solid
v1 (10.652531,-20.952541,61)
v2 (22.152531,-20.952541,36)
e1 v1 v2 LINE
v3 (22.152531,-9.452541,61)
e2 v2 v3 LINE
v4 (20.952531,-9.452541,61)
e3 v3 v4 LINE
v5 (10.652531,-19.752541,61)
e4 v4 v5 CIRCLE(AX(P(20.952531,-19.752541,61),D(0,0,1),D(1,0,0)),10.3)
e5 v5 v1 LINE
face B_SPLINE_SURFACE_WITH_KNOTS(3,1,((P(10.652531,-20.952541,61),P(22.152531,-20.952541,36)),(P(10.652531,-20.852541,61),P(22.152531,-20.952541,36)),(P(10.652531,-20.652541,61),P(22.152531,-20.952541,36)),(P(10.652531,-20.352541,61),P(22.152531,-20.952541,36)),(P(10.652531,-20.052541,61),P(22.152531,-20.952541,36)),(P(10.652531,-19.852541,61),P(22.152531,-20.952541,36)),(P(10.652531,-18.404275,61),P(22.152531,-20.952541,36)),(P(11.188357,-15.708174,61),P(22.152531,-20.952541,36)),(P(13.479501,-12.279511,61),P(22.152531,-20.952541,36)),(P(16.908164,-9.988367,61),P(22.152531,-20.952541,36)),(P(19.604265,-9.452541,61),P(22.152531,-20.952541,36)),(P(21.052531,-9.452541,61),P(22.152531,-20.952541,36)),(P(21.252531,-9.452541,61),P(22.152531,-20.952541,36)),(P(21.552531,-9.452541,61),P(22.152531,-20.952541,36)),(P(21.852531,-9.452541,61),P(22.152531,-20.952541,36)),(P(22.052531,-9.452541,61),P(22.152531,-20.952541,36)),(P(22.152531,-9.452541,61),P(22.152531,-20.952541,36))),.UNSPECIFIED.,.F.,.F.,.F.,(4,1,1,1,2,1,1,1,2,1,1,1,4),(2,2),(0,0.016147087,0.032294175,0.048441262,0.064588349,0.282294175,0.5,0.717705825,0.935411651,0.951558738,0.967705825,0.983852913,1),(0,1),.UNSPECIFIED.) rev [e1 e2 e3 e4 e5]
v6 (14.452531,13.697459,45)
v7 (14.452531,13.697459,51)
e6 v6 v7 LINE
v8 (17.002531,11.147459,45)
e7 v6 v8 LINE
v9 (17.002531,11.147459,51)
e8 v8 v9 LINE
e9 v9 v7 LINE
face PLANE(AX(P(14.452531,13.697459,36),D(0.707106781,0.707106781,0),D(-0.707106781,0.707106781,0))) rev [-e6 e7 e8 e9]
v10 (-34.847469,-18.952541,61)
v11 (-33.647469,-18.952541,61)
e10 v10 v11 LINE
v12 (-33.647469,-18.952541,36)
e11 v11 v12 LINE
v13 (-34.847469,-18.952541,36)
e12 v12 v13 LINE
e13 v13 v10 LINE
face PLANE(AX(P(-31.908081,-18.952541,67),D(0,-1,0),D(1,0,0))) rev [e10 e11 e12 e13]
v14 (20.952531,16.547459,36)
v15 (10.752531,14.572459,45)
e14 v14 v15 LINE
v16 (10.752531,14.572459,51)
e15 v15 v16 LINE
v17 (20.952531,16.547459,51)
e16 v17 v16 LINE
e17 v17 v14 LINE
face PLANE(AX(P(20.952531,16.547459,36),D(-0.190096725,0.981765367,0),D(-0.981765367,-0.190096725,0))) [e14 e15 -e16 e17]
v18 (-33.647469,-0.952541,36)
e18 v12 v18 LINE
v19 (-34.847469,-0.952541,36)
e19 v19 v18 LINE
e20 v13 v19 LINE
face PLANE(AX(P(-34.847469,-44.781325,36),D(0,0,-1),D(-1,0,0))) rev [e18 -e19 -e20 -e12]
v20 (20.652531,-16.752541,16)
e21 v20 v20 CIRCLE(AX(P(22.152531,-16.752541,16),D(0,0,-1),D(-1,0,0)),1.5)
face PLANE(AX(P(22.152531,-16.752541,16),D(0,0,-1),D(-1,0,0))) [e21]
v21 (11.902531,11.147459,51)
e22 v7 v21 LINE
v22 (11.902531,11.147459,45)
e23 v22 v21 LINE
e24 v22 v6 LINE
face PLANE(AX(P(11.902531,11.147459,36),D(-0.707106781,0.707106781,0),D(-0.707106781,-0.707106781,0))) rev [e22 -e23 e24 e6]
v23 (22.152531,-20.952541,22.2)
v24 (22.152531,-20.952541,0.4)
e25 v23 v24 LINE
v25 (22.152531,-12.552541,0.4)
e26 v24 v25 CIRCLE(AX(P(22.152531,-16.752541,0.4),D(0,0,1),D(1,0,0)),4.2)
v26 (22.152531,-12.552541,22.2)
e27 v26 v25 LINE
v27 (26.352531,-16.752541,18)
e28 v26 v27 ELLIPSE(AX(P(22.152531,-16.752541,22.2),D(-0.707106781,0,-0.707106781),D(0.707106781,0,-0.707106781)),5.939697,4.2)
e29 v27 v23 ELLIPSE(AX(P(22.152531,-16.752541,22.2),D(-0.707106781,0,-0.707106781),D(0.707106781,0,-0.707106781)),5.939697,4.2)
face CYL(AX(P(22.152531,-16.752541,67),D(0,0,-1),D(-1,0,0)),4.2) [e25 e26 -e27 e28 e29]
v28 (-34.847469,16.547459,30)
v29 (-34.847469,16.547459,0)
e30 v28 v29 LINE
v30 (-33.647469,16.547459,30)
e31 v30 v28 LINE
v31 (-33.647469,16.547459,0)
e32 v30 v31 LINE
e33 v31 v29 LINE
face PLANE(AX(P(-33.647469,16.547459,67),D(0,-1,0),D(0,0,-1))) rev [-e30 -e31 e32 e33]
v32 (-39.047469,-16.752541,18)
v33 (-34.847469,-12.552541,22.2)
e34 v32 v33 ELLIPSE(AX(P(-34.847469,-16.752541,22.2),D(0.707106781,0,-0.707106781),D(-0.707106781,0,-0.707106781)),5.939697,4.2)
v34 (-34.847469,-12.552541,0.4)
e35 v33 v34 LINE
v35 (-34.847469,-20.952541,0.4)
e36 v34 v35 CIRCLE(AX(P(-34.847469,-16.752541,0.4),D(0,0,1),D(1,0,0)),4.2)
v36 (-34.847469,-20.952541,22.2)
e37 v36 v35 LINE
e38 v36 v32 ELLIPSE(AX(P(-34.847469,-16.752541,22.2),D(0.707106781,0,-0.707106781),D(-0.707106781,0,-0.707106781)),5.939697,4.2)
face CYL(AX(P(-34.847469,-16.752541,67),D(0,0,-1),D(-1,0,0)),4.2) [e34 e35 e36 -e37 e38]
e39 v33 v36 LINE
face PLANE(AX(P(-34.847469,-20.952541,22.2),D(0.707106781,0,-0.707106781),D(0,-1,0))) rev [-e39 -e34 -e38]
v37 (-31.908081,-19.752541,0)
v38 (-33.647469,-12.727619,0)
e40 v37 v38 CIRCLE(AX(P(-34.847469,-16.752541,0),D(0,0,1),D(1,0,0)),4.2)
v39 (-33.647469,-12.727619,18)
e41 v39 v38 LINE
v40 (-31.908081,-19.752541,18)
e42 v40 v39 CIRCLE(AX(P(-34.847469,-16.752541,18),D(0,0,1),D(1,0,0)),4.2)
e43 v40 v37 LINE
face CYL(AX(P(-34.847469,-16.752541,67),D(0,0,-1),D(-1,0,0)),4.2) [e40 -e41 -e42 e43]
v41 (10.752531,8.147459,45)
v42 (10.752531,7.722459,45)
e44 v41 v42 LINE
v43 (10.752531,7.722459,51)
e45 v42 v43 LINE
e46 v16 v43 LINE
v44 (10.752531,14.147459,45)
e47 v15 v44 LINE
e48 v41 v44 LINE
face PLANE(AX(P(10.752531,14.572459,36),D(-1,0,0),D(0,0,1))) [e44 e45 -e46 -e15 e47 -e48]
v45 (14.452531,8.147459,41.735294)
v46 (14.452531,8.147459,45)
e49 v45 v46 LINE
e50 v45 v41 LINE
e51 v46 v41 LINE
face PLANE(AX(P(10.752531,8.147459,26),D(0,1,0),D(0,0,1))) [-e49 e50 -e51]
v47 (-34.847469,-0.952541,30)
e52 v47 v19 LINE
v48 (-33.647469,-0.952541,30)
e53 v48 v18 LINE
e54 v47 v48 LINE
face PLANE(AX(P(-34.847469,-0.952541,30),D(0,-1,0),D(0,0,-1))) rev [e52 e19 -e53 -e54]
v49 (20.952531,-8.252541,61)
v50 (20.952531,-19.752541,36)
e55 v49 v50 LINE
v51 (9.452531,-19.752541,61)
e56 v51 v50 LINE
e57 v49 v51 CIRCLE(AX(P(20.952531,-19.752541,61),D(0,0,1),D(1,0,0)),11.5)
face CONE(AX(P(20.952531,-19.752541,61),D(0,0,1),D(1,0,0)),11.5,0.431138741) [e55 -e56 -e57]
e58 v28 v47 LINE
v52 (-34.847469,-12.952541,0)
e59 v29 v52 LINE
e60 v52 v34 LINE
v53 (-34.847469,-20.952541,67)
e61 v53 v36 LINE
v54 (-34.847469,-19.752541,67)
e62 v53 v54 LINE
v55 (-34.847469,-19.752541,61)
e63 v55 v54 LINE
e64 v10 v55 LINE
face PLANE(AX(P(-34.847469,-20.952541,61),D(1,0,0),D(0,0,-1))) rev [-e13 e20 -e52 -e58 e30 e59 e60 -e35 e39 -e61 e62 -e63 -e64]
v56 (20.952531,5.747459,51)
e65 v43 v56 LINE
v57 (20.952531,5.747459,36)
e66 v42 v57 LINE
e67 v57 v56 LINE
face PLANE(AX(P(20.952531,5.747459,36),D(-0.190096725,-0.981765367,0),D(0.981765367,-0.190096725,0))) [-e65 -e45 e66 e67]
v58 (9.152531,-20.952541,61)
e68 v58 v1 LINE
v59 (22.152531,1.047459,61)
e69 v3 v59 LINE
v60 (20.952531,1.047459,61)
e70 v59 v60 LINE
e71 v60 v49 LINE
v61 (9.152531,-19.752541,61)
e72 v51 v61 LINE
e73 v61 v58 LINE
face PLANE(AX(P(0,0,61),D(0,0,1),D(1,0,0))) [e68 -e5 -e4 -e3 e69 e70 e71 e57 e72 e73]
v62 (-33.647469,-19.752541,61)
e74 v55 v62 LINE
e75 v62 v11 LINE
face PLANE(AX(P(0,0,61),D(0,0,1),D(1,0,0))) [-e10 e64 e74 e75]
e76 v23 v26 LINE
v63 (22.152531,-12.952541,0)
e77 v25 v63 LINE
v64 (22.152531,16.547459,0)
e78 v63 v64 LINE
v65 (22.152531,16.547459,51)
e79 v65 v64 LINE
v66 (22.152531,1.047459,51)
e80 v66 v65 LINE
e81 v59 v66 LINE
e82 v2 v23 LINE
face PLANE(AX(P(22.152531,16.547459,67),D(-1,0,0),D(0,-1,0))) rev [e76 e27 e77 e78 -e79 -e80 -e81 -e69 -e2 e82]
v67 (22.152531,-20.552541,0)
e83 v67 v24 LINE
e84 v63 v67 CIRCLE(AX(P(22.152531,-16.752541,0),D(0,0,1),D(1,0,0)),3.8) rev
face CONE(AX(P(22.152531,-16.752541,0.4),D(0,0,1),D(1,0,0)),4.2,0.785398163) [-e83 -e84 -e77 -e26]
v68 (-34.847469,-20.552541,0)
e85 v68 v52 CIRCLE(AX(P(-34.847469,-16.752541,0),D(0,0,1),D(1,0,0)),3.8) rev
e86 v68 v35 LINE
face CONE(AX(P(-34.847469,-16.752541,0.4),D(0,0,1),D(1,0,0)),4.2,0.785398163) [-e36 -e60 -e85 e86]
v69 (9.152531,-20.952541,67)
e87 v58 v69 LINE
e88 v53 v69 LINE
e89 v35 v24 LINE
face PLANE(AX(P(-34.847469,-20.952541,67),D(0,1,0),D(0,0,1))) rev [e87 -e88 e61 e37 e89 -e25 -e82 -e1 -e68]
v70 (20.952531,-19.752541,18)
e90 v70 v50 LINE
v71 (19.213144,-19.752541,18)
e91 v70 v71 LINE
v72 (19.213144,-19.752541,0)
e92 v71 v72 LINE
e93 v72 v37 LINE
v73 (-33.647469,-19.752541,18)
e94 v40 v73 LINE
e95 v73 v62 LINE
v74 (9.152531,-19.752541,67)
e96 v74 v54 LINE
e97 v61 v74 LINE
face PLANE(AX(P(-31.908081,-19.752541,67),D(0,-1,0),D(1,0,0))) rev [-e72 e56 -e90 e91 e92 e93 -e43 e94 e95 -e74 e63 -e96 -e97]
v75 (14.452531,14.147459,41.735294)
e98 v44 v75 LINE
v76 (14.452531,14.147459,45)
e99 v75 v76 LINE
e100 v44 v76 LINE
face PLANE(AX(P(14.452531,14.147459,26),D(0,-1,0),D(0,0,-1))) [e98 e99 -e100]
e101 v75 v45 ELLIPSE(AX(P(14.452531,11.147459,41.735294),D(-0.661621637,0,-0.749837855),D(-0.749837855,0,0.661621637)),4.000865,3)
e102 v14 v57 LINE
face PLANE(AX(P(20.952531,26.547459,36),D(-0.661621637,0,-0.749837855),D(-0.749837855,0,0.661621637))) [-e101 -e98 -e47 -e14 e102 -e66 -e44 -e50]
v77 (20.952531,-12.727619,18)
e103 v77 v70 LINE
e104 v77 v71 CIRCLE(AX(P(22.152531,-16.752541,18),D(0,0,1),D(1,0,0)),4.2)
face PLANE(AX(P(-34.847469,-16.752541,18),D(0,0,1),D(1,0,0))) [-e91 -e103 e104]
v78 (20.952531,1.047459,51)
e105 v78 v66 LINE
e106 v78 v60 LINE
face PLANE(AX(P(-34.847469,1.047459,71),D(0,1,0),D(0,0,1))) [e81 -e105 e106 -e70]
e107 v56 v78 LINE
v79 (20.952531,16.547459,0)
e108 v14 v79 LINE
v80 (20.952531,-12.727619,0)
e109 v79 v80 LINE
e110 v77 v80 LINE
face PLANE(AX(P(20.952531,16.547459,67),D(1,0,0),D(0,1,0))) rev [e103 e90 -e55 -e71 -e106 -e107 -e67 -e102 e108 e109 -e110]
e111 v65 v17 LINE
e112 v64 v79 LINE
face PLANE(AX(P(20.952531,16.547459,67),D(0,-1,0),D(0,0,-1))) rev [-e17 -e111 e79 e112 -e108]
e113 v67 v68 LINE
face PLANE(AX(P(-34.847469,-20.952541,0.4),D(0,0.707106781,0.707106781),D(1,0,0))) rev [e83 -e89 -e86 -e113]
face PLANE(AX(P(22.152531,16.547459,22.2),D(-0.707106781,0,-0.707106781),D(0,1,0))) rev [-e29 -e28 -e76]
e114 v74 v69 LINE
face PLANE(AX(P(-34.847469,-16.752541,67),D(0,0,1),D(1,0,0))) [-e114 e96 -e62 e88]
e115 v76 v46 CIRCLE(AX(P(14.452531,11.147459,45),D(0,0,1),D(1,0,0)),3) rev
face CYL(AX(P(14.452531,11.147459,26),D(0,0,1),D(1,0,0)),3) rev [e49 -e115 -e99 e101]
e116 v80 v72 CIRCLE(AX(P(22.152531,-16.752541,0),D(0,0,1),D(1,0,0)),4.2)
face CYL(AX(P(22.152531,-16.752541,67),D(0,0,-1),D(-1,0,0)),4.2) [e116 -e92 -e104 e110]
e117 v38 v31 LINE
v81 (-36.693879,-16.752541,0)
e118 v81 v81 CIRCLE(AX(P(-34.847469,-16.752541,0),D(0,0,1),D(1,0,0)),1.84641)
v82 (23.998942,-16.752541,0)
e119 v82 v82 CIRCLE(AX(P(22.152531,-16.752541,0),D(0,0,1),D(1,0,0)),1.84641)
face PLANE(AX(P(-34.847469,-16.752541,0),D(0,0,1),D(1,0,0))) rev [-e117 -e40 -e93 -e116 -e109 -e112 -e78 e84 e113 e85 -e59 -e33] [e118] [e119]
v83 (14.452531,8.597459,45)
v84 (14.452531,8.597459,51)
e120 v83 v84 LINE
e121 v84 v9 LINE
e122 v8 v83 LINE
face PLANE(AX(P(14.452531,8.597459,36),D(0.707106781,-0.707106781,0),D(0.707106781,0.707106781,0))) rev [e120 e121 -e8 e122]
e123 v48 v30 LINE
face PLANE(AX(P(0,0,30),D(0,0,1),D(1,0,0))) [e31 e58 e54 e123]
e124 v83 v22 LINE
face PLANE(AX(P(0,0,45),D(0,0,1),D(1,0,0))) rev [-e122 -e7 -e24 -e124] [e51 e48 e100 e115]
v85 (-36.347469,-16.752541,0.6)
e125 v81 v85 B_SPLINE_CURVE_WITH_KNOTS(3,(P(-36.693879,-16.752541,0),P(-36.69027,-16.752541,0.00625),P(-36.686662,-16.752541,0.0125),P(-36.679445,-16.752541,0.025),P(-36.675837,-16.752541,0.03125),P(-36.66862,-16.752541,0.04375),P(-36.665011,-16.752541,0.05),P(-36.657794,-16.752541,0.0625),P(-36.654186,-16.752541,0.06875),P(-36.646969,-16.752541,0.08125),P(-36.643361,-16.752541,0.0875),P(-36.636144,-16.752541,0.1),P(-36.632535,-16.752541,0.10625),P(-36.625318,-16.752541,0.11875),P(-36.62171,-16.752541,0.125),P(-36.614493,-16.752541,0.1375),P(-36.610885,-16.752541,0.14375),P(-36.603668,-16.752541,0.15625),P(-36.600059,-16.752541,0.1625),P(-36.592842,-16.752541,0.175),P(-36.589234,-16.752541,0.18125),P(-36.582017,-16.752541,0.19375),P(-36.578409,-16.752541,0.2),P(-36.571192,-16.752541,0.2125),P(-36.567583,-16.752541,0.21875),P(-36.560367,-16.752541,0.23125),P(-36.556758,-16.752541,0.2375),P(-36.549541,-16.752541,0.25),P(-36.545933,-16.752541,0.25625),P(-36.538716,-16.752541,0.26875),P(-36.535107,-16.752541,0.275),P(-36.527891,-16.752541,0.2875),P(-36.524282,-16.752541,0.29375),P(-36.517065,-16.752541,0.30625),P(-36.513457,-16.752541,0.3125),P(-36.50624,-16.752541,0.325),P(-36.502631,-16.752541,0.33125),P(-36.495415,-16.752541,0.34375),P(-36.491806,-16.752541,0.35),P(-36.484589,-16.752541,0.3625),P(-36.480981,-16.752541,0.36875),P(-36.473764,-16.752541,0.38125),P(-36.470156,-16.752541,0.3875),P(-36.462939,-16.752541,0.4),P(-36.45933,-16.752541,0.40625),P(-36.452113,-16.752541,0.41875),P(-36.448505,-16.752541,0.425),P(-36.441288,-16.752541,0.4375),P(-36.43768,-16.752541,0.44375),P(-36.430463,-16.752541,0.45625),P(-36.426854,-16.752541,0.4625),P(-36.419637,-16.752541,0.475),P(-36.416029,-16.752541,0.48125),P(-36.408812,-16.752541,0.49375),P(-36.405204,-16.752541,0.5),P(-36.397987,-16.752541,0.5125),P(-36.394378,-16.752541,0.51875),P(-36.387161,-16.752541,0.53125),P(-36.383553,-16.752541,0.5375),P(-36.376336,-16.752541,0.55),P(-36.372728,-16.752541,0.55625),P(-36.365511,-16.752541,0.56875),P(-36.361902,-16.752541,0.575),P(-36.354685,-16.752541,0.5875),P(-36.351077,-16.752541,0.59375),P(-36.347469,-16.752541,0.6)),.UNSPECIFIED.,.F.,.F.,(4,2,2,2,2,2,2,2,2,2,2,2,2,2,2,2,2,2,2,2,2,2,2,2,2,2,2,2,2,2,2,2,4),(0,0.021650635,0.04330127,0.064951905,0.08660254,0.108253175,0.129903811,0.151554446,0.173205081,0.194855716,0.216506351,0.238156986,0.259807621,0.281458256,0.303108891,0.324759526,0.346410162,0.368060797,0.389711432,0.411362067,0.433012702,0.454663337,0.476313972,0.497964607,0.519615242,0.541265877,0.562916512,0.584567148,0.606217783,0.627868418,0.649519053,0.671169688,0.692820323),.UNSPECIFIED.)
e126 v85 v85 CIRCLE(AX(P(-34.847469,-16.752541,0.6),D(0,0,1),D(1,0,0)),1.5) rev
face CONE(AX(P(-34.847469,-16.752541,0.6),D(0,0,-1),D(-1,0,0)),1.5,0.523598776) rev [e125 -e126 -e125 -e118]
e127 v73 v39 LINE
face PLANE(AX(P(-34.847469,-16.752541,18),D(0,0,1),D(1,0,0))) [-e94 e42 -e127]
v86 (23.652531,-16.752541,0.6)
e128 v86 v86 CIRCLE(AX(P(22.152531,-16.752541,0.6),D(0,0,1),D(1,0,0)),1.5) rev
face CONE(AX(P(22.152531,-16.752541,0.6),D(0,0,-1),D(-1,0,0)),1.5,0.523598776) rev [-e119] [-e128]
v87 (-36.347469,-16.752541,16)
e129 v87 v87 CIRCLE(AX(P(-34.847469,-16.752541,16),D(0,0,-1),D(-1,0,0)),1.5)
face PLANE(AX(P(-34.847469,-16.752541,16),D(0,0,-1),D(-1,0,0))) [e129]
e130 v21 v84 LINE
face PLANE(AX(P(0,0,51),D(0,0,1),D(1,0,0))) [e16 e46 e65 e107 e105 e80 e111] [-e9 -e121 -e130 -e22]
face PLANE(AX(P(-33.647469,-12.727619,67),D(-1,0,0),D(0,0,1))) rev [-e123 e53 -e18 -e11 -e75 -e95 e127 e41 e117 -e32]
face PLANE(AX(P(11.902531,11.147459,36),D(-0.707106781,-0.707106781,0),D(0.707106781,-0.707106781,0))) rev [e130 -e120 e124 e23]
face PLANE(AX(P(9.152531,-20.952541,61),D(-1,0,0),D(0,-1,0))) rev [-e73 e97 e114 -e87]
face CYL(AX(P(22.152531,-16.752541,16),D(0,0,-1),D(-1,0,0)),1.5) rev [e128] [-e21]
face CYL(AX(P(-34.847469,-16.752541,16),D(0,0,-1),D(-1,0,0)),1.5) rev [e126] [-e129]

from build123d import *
from OCP.BRepFilletAPI import BRepFilletAPI_MakeChamfer

# Parameters (mm, degrees)
BOSS_EXTRUDE1_DEPTH            = 67
CUT_EXTRUDE1_DEPTH             = 6
CUT_EXTRUDE2_DEPTH             = 10
CUT_EXTRUDE2_DEPTH_BACK        = 10
SKETCH3_W                      = 57
SKETCH3_H                      = 15.5
SKETCH4_W                      = 1.200010082
SKETCH4_H                      = 17.5
CUT_EXTRUDE3_DEPTH             = 21
SKETCH6_R                      = 1.5
CUT_EXTRUDE4_DEPTH             = 16
SKETCH7_W                      = 9.665590287
SKETCH7_H                      = 8.4
SKETCH7_W_2                    = 5.868264521
SKETCH7_H_2                    = 7.024922359
SKETCH7_W_3                    = 9.177584355
SKETCH7_H_3                    = 13.349294629
SKETCH7_W_4                    = 6.831514048
SKETCH7_H_4                    = 12.149294629
CUT_EXTRUDE5_DEPTH             = 43
CHAMFER1_SIZE                  = 4.2
CHAMFER3_SIZE                  = 0.6
CHAMFER3_SIZE2                 = 0.346410162
CHAMFER4_SIZE                  = 0.4
BOSS_EXTRUDE2_DEPTH            = 15
CUT_EXTRUDE6_DEPTH             = 10
CUT_EXTRUDE6_DEPTH_BACK        = 9
CUT_EXTRUDE7_REACH             = 88.139
CUT_EXTRUDE7_DIRECTION_2_DEPTH = 10
SKETCH12_W                     = 1.2
SKETCH12_H                     = 25
CUT_EXTRUDE8_DEPTH             = 20


with BuildPart() as part:
    # Sketch1 → Boss-Extrude1 (new body)
    with BuildSketch(Plane.XY):
        with BuildLine():
            Line((-33.64746859, 16.547458508), (-34.84746859, 16.547458508))
            Line((-34.84746859, 16.547458508), (-34.84746859, -12.552541492))
            ThreePointArc((-34.84746859, -12.552541492), (-39.04746859, -16.752541492), (-34.84746859, -20.952541492))
            Line((-34.84746859, -20.952541492), (22.15253141, -20.952541492))
            ThreePointArc((22.15253141, -20.952541492), (26.35253141, -16.752541492), (22.15253141, -12.552541492))
            Line((22.15253141, -12.552541492), (22.15253141, 16.547458508))
            Line((22.15253141, 16.547458508), (20.95253141, 16.547458508))
            Line((20.95253141, 16.547458508), (20.95253141, -12.727619133))
            ThreePointArc((20.95253141, -12.727619133), (18.075643363, -15.743094195), (19.213143719, -19.752541492))
            Line((19.213143719, -19.752541492), (-31.908080898, -19.752541492))
            ThreePointArc((-31.908080898, -19.752541492), (-30.770580542, -15.743094195), (-33.64746859, -12.727619133))
            Line((-33.64746859, -12.727619133), (-33.64746859, 16.547458508))
        make_face()
    extrude(amount=BOSS_EXTRUDE1_DEPTH)

    # Sketch2 → Cut-Extrude1 (cut)
    with BuildSketch(Plane.XY.offset(67)):
        Polygon((9.15253141, -20.952541492), (32.878117539, -20.952541492), (32.878117539, 12.674112742), (-34.84746859, 12.674112742), (-34.84746859, -7.507472589), (-42.7406396, -7.507472589), (-42.7406396, -20.952541492), (-34.84746859, -20.952541492), (-34.84746859, -19.752541492), (9.15253141, -19.752541492), align=None)
    extrude(amount=-CUT_EXTRUDE1_DEPTH, mode=Mode.SUBTRACT)

    # Sketch3 → Cut-Extrude2 (cut, two sides: drawn at the far end of the back side and taken through both)
    with BuildSketch(Plane.XY.offset(61).offset(-CUT_EXTRUDE2_DEPTH_BACK)):
        with Locations((-6.34746859, 8.797458508)):
            Rectangle(SKETCH3_W, SKETCH3_H)
    extrude(amount=CUT_EXTRUDE2_DEPTH + CUT_EXTRUDE2_DEPTH_BACK, mode=Mode.SUBTRACT)

    # Sketch4 → Cut-Extrude3 (cut)
    with BuildSketch(Plane.XY.offset(51)):
        with Locations((-34.247463549, 7.797458508)):
            Rectangle(SKETCH4_W, SKETCH4_H)
    extrude(amount=-CUT_EXTRUDE3_DEPTH, mode=Mode.SUBTRACT)

    # Sketch6 → Cut-Extrude4 (cut)
    with BuildSketch(Plane(origin=(0, 0, 0), x_dir=(-1, 0, 0), z_dir=(0, 0, -1))):
        with Locations((-22.15253141, -16.752541492)):
            Circle(SKETCH6_R)
        with Locations((34.84746859, -16.752541492)):
            Circle(SKETCH6_R)
    extrude(amount=-CUT_EXTRUDE4_DEPTH, mode=Mode.SUBTRACT)

    # Sketch7 → Cut-Extrude5 (cut)
    with BuildSketch(Plane.XY.offset(61)):
        with Locations((26.985326554, -16.752541492)):
            Rectangle(SKETCH7_W, SKETCH7_H)
        with Locations((18.01839915, -16.240080313)):
            Rectangle(SKETCH7_W_2, SKETCH7_H_2)
        with Locations((-39.436260768, -14.277894178)):
            Rectangle(SKETCH7_W_3, SKETCH7_H_3)
        with Locations((-30.231711566, -13.677894178)):
            Rectangle(SKETCH7_W_4, SKETCH7_H_4)
    extrude(amount=-CUT_EXTRUDE5_DEPTH, mode=Mode.SUBTRACT)

    # Chamfer1
    # the kernel refuses this chamfer: 4.2 mm, written as the material it adds along each edge
    with BuildSketch(Plane(origin=(22.15253141, -31.753610042, 18), x_dir=(0.9996219169112966, 0, -0.02749587661058613), z_dir=(0, 1, 0))) as chamfer1_piece_1_section:
        Polygon((CHAMFER1_SIZE * 0.999621916911, -CHAMFER1_SIZE * 0.0274958766106), (-CHAMFER1_SIZE * 0.0274958766106, -CHAMFER1_SIZE * 0.999621916911), (0, 0), align=None)
    chamfer1_piece_1 = extrude(amount=30.002137099, mode=Mode.PRIVATE)
    chamfer1_piece_1 = chamfer1_piece_1 & Plane(origin=(22.15253141, -16.752541492, 19.463662148), x_dir=(0, -1, 0), z_dir=(0, 0, -1)) * Cylinder(4.2, 77, mode=Mode.PRIVATE)
    add(chamfer1_piece_1)
    with BuildSketch(Plane(origin=(-34.84746859, -1.751472943, 18), x_dir=(-0.9996219169112966, 0, -0.02749587661058611), z_dir=(0, -1, 0))) as chamfer1_piece_2_section:
        Polygon((CHAMFER1_SIZE * 0.999621916911, -CHAMFER1_SIZE * 0.0274958766106), (-CHAMFER1_SIZE * 0.0274958766106, -CHAMFER1_SIZE * 0.999621916911), (0, 0), align=None)
    chamfer1_piece_2 = extrude(amount=30.002137099, mode=Mode.PRIVATE)
    chamfer1_piece_2 = chamfer1_piece_2 & Plane(origin=(-34.84746859, -16.752541492, 19.463662148), x_dir=(0, 1, 0), z_dir=(0, 0, -1)) * Cylinder(4.2, 77, mode=Mode.PRIVATE)
    add(chamfer1_piece_2)

    # Chamfer3: one chamfer whose edges measure the first distance from different faces: ONE call of the kernel's chamfer builder (chamfer() names one face for all edges)
    chamfer3_edges_1 = [part.edges().sort_by_distance(p)[0] for p in [
        (23.65253141, -16.752541492, 0),
    ]]
    chamfer3_side_1 = [part.faces().sort_by_distance(p)[0] for p in [
        (23.65253141, -16.752541492, 8),
    ]]
    chamfer3_edges_2 = [part.edges().sort_by_distance(p)[0] for p in [
        (-33.34746859, -16.752541492, 0),
    ]]
    chamfer3_side_2 = [part.faces().sort_by_distance(p)[0] for p in [
        (-33.34746859, -16.752541492, 8),
    ]]
    chamfer3 = BRepFilletAPI_MakeChamfer(part.part.solid().wrapped)
    for e in chamfer3_edges_1:
        chamfer3.Add(CHAMFER3_SIZE, CHAMFER3_SIZE2, e.wrapped, chamfer3_side_1[0].wrapped)  # the first distance lies on this face
    for e in chamfer3_edges_2:
        chamfer3.Add(CHAMFER3_SIZE, CHAMFER3_SIZE2, e.wrapped, chamfer3_side_2[0].wrapped)  # the first distance lies on this face
    add(Compound.cast(chamfer3.Shape()), mode=Mode.REPLACE)

    # Chamfer4
    chamfer4_edges = [part.edges().sort_by_distance(p)[0] for p in [
        (26.35253141, -16.752541492, 0),
        (-6.34746859, -20.952541492, 0),
        (-39.04746859, -16.752541492, 0),
    ]]
    chamfer(chamfer4_edges, length=CHAMFER4_SIZE)

    # Sketch8 → Boss-Extrude2 (add)
    with BuildSketch(Plane.XY.offset(51)):
        Polygon((10.75253141, 14.572458508), (10.75253141, 12.747458508), (10.75253141, 9.547458508), (10.75253141, 7.722458508), (20.95253141, 5.747458508), (22.15253141, 5.747458508), (22.15253141, 16.547458508), (20.95253141, 16.547458508), align=None)
        Polygon((11.90253141, 11.147458508), (14.45253141, 13.697458508), (17.00253141, 11.147458508), (14.45253141, 8.597458508), align=None, mode=Mode.SUBTRACT)
    extrude(amount=-BOSS_EXTRUDE2_DEPTH)

    # Sketch10 → Cut-Extrude6 (cut, two sides: drawn at the far end of the back side and taken through both)
    with BuildSketch(Plane(origin=(0, 0, 36), x_dir=(-1, 0, 0), z_dir=(0, 0, -1)).offset(-CUT_EXTRUDE6_DEPTH_BACK)):
        with BuildLine():
            Line((-14.45253141, 14.147458508), (-10.75253141, 14.147458508))
            Line((-10.75253141, 14.147458508), (-10.75253141, 8.147458508))
            Line((-10.75253141, 8.147458508), (-14.45253141, 8.147458508))
            ThreePointArc((-14.45253141, 8.147458508), (-17.45253141, 11.147458508), (-14.45253141, 14.147458508))
        make_face()
    extrude(amount=CUT_EXTRUDE6_DEPTH + CUT_EXTRUDE6_DEPTH_BACK, mode=Mode.SUBTRACT)

    # Cut-Extrude7: up to this plane
    cut_extrude7_end = Plane(origin=(20.95253141, 5.747458508, 36), z_dir=(-0.19009672538975653, -0.9817653665698803, 0))
    # Sketch11 → Cut-Extrude7 (cut, up to the surface)
    with BuildSketch(Plane(origin=(0, 16.547458508, 0), x_dir=(1, 0, 0), z_dir=(0, 1, 0)), mode=Mode.PRIVATE) as cut_extrude7_sk1:
        Polygon((20.95253141, -36), (10.75253141, -45), (10.75253141, -36), align=None)
    cut_extrude7_tool1 = split(extrude(cut_extrude7_sk1.sketch, amount=-CUT_EXTRUDE7_REACH, mode=Mode.PRIVATE), bisect_by=cut_extrude7_end, keep=Keep.BOTH, mode=Mode.PRIVATE)
    add(cut_extrude7_tool1.solids().sort_by_distance((14.152531, 16.547459, 39))[0], mode=Mode.SUBTRACT)

    # Sketch11 → Cut-Extrude7 direction 2 (cut)
    with BuildSketch(Plane(origin=(0, 16.547458508, 0), x_dir=(1, 0, 0), z_dir=(0, 1, 0))):
        Polygon((20.95253141, -36), (10.75253141, -45), (10.75253141, -36), align=None)
    extrude(amount=CUT_EXTRUDE7_DIRECTION_2_DEPTH, mode=Mode.SUBTRACT)

    # Sketch12 → Cut-Extrude8 (cut)
    with BuildSketch(Plane(origin=(0, 1.047458508, 0), x_dir=(1, 0, 0), z_dir=(0, 1, 0))):
        with Locations((-34.24746859, -48.5)):
            Rectangle(SKETCH12_W, SKETCH12_H)
    extrude(amount=-CUT_EXTRUDE8_DEPTH, mode=Mode.SUBTRACT)

    # Sketch13 → Loft1 section 0
    with BuildSketch(Plane.XY.offset(61), mode=Mode.PRIVATE) as loft1_s0:
        with BuildLine():
            Line((9.45253141, -19.752541492), (20.95253141, -19.752541492))
            Line((20.95253141, -19.752541492), (20.95253141, -8.252541492))
            ThreePointArc((20.95253141, -8.252541492), (12.820803427, -11.620813508), (9.45253141, -19.752541492))
        make_face()
    loft([loft1_s0.sketch, Vertex(20.95253141, -19.752541492, 36)])

    # Sketch15 → Cut-Loft1 section 0
    with BuildSketch(Plane.XY.offset(61), mode=Mode.PRIVATE) as cut_loft1_s0:
        with BuildLine():
            Line((20.95253141, -9.452541492), (22.15253141, -9.452541492))
            Line((22.15253141, -9.452541492), (22.15253141, -20.952541492))
            Line((22.15253141, -20.952541492), (10.65253141, -20.952541492))
            Line((10.65253141, -20.952541492), (10.65253141, -19.752541492))
            ThreePointArc((10.65253141, -19.752541492), (13.669331564, -12.469341646), (20.95253141, -9.452541492))
        make_face()
    loft([cut_loft1_s0.sketch, Vertex(22.15253141, -20.952541492, 36)], mode=Mode.SUBTRACT)


solid = part.part
